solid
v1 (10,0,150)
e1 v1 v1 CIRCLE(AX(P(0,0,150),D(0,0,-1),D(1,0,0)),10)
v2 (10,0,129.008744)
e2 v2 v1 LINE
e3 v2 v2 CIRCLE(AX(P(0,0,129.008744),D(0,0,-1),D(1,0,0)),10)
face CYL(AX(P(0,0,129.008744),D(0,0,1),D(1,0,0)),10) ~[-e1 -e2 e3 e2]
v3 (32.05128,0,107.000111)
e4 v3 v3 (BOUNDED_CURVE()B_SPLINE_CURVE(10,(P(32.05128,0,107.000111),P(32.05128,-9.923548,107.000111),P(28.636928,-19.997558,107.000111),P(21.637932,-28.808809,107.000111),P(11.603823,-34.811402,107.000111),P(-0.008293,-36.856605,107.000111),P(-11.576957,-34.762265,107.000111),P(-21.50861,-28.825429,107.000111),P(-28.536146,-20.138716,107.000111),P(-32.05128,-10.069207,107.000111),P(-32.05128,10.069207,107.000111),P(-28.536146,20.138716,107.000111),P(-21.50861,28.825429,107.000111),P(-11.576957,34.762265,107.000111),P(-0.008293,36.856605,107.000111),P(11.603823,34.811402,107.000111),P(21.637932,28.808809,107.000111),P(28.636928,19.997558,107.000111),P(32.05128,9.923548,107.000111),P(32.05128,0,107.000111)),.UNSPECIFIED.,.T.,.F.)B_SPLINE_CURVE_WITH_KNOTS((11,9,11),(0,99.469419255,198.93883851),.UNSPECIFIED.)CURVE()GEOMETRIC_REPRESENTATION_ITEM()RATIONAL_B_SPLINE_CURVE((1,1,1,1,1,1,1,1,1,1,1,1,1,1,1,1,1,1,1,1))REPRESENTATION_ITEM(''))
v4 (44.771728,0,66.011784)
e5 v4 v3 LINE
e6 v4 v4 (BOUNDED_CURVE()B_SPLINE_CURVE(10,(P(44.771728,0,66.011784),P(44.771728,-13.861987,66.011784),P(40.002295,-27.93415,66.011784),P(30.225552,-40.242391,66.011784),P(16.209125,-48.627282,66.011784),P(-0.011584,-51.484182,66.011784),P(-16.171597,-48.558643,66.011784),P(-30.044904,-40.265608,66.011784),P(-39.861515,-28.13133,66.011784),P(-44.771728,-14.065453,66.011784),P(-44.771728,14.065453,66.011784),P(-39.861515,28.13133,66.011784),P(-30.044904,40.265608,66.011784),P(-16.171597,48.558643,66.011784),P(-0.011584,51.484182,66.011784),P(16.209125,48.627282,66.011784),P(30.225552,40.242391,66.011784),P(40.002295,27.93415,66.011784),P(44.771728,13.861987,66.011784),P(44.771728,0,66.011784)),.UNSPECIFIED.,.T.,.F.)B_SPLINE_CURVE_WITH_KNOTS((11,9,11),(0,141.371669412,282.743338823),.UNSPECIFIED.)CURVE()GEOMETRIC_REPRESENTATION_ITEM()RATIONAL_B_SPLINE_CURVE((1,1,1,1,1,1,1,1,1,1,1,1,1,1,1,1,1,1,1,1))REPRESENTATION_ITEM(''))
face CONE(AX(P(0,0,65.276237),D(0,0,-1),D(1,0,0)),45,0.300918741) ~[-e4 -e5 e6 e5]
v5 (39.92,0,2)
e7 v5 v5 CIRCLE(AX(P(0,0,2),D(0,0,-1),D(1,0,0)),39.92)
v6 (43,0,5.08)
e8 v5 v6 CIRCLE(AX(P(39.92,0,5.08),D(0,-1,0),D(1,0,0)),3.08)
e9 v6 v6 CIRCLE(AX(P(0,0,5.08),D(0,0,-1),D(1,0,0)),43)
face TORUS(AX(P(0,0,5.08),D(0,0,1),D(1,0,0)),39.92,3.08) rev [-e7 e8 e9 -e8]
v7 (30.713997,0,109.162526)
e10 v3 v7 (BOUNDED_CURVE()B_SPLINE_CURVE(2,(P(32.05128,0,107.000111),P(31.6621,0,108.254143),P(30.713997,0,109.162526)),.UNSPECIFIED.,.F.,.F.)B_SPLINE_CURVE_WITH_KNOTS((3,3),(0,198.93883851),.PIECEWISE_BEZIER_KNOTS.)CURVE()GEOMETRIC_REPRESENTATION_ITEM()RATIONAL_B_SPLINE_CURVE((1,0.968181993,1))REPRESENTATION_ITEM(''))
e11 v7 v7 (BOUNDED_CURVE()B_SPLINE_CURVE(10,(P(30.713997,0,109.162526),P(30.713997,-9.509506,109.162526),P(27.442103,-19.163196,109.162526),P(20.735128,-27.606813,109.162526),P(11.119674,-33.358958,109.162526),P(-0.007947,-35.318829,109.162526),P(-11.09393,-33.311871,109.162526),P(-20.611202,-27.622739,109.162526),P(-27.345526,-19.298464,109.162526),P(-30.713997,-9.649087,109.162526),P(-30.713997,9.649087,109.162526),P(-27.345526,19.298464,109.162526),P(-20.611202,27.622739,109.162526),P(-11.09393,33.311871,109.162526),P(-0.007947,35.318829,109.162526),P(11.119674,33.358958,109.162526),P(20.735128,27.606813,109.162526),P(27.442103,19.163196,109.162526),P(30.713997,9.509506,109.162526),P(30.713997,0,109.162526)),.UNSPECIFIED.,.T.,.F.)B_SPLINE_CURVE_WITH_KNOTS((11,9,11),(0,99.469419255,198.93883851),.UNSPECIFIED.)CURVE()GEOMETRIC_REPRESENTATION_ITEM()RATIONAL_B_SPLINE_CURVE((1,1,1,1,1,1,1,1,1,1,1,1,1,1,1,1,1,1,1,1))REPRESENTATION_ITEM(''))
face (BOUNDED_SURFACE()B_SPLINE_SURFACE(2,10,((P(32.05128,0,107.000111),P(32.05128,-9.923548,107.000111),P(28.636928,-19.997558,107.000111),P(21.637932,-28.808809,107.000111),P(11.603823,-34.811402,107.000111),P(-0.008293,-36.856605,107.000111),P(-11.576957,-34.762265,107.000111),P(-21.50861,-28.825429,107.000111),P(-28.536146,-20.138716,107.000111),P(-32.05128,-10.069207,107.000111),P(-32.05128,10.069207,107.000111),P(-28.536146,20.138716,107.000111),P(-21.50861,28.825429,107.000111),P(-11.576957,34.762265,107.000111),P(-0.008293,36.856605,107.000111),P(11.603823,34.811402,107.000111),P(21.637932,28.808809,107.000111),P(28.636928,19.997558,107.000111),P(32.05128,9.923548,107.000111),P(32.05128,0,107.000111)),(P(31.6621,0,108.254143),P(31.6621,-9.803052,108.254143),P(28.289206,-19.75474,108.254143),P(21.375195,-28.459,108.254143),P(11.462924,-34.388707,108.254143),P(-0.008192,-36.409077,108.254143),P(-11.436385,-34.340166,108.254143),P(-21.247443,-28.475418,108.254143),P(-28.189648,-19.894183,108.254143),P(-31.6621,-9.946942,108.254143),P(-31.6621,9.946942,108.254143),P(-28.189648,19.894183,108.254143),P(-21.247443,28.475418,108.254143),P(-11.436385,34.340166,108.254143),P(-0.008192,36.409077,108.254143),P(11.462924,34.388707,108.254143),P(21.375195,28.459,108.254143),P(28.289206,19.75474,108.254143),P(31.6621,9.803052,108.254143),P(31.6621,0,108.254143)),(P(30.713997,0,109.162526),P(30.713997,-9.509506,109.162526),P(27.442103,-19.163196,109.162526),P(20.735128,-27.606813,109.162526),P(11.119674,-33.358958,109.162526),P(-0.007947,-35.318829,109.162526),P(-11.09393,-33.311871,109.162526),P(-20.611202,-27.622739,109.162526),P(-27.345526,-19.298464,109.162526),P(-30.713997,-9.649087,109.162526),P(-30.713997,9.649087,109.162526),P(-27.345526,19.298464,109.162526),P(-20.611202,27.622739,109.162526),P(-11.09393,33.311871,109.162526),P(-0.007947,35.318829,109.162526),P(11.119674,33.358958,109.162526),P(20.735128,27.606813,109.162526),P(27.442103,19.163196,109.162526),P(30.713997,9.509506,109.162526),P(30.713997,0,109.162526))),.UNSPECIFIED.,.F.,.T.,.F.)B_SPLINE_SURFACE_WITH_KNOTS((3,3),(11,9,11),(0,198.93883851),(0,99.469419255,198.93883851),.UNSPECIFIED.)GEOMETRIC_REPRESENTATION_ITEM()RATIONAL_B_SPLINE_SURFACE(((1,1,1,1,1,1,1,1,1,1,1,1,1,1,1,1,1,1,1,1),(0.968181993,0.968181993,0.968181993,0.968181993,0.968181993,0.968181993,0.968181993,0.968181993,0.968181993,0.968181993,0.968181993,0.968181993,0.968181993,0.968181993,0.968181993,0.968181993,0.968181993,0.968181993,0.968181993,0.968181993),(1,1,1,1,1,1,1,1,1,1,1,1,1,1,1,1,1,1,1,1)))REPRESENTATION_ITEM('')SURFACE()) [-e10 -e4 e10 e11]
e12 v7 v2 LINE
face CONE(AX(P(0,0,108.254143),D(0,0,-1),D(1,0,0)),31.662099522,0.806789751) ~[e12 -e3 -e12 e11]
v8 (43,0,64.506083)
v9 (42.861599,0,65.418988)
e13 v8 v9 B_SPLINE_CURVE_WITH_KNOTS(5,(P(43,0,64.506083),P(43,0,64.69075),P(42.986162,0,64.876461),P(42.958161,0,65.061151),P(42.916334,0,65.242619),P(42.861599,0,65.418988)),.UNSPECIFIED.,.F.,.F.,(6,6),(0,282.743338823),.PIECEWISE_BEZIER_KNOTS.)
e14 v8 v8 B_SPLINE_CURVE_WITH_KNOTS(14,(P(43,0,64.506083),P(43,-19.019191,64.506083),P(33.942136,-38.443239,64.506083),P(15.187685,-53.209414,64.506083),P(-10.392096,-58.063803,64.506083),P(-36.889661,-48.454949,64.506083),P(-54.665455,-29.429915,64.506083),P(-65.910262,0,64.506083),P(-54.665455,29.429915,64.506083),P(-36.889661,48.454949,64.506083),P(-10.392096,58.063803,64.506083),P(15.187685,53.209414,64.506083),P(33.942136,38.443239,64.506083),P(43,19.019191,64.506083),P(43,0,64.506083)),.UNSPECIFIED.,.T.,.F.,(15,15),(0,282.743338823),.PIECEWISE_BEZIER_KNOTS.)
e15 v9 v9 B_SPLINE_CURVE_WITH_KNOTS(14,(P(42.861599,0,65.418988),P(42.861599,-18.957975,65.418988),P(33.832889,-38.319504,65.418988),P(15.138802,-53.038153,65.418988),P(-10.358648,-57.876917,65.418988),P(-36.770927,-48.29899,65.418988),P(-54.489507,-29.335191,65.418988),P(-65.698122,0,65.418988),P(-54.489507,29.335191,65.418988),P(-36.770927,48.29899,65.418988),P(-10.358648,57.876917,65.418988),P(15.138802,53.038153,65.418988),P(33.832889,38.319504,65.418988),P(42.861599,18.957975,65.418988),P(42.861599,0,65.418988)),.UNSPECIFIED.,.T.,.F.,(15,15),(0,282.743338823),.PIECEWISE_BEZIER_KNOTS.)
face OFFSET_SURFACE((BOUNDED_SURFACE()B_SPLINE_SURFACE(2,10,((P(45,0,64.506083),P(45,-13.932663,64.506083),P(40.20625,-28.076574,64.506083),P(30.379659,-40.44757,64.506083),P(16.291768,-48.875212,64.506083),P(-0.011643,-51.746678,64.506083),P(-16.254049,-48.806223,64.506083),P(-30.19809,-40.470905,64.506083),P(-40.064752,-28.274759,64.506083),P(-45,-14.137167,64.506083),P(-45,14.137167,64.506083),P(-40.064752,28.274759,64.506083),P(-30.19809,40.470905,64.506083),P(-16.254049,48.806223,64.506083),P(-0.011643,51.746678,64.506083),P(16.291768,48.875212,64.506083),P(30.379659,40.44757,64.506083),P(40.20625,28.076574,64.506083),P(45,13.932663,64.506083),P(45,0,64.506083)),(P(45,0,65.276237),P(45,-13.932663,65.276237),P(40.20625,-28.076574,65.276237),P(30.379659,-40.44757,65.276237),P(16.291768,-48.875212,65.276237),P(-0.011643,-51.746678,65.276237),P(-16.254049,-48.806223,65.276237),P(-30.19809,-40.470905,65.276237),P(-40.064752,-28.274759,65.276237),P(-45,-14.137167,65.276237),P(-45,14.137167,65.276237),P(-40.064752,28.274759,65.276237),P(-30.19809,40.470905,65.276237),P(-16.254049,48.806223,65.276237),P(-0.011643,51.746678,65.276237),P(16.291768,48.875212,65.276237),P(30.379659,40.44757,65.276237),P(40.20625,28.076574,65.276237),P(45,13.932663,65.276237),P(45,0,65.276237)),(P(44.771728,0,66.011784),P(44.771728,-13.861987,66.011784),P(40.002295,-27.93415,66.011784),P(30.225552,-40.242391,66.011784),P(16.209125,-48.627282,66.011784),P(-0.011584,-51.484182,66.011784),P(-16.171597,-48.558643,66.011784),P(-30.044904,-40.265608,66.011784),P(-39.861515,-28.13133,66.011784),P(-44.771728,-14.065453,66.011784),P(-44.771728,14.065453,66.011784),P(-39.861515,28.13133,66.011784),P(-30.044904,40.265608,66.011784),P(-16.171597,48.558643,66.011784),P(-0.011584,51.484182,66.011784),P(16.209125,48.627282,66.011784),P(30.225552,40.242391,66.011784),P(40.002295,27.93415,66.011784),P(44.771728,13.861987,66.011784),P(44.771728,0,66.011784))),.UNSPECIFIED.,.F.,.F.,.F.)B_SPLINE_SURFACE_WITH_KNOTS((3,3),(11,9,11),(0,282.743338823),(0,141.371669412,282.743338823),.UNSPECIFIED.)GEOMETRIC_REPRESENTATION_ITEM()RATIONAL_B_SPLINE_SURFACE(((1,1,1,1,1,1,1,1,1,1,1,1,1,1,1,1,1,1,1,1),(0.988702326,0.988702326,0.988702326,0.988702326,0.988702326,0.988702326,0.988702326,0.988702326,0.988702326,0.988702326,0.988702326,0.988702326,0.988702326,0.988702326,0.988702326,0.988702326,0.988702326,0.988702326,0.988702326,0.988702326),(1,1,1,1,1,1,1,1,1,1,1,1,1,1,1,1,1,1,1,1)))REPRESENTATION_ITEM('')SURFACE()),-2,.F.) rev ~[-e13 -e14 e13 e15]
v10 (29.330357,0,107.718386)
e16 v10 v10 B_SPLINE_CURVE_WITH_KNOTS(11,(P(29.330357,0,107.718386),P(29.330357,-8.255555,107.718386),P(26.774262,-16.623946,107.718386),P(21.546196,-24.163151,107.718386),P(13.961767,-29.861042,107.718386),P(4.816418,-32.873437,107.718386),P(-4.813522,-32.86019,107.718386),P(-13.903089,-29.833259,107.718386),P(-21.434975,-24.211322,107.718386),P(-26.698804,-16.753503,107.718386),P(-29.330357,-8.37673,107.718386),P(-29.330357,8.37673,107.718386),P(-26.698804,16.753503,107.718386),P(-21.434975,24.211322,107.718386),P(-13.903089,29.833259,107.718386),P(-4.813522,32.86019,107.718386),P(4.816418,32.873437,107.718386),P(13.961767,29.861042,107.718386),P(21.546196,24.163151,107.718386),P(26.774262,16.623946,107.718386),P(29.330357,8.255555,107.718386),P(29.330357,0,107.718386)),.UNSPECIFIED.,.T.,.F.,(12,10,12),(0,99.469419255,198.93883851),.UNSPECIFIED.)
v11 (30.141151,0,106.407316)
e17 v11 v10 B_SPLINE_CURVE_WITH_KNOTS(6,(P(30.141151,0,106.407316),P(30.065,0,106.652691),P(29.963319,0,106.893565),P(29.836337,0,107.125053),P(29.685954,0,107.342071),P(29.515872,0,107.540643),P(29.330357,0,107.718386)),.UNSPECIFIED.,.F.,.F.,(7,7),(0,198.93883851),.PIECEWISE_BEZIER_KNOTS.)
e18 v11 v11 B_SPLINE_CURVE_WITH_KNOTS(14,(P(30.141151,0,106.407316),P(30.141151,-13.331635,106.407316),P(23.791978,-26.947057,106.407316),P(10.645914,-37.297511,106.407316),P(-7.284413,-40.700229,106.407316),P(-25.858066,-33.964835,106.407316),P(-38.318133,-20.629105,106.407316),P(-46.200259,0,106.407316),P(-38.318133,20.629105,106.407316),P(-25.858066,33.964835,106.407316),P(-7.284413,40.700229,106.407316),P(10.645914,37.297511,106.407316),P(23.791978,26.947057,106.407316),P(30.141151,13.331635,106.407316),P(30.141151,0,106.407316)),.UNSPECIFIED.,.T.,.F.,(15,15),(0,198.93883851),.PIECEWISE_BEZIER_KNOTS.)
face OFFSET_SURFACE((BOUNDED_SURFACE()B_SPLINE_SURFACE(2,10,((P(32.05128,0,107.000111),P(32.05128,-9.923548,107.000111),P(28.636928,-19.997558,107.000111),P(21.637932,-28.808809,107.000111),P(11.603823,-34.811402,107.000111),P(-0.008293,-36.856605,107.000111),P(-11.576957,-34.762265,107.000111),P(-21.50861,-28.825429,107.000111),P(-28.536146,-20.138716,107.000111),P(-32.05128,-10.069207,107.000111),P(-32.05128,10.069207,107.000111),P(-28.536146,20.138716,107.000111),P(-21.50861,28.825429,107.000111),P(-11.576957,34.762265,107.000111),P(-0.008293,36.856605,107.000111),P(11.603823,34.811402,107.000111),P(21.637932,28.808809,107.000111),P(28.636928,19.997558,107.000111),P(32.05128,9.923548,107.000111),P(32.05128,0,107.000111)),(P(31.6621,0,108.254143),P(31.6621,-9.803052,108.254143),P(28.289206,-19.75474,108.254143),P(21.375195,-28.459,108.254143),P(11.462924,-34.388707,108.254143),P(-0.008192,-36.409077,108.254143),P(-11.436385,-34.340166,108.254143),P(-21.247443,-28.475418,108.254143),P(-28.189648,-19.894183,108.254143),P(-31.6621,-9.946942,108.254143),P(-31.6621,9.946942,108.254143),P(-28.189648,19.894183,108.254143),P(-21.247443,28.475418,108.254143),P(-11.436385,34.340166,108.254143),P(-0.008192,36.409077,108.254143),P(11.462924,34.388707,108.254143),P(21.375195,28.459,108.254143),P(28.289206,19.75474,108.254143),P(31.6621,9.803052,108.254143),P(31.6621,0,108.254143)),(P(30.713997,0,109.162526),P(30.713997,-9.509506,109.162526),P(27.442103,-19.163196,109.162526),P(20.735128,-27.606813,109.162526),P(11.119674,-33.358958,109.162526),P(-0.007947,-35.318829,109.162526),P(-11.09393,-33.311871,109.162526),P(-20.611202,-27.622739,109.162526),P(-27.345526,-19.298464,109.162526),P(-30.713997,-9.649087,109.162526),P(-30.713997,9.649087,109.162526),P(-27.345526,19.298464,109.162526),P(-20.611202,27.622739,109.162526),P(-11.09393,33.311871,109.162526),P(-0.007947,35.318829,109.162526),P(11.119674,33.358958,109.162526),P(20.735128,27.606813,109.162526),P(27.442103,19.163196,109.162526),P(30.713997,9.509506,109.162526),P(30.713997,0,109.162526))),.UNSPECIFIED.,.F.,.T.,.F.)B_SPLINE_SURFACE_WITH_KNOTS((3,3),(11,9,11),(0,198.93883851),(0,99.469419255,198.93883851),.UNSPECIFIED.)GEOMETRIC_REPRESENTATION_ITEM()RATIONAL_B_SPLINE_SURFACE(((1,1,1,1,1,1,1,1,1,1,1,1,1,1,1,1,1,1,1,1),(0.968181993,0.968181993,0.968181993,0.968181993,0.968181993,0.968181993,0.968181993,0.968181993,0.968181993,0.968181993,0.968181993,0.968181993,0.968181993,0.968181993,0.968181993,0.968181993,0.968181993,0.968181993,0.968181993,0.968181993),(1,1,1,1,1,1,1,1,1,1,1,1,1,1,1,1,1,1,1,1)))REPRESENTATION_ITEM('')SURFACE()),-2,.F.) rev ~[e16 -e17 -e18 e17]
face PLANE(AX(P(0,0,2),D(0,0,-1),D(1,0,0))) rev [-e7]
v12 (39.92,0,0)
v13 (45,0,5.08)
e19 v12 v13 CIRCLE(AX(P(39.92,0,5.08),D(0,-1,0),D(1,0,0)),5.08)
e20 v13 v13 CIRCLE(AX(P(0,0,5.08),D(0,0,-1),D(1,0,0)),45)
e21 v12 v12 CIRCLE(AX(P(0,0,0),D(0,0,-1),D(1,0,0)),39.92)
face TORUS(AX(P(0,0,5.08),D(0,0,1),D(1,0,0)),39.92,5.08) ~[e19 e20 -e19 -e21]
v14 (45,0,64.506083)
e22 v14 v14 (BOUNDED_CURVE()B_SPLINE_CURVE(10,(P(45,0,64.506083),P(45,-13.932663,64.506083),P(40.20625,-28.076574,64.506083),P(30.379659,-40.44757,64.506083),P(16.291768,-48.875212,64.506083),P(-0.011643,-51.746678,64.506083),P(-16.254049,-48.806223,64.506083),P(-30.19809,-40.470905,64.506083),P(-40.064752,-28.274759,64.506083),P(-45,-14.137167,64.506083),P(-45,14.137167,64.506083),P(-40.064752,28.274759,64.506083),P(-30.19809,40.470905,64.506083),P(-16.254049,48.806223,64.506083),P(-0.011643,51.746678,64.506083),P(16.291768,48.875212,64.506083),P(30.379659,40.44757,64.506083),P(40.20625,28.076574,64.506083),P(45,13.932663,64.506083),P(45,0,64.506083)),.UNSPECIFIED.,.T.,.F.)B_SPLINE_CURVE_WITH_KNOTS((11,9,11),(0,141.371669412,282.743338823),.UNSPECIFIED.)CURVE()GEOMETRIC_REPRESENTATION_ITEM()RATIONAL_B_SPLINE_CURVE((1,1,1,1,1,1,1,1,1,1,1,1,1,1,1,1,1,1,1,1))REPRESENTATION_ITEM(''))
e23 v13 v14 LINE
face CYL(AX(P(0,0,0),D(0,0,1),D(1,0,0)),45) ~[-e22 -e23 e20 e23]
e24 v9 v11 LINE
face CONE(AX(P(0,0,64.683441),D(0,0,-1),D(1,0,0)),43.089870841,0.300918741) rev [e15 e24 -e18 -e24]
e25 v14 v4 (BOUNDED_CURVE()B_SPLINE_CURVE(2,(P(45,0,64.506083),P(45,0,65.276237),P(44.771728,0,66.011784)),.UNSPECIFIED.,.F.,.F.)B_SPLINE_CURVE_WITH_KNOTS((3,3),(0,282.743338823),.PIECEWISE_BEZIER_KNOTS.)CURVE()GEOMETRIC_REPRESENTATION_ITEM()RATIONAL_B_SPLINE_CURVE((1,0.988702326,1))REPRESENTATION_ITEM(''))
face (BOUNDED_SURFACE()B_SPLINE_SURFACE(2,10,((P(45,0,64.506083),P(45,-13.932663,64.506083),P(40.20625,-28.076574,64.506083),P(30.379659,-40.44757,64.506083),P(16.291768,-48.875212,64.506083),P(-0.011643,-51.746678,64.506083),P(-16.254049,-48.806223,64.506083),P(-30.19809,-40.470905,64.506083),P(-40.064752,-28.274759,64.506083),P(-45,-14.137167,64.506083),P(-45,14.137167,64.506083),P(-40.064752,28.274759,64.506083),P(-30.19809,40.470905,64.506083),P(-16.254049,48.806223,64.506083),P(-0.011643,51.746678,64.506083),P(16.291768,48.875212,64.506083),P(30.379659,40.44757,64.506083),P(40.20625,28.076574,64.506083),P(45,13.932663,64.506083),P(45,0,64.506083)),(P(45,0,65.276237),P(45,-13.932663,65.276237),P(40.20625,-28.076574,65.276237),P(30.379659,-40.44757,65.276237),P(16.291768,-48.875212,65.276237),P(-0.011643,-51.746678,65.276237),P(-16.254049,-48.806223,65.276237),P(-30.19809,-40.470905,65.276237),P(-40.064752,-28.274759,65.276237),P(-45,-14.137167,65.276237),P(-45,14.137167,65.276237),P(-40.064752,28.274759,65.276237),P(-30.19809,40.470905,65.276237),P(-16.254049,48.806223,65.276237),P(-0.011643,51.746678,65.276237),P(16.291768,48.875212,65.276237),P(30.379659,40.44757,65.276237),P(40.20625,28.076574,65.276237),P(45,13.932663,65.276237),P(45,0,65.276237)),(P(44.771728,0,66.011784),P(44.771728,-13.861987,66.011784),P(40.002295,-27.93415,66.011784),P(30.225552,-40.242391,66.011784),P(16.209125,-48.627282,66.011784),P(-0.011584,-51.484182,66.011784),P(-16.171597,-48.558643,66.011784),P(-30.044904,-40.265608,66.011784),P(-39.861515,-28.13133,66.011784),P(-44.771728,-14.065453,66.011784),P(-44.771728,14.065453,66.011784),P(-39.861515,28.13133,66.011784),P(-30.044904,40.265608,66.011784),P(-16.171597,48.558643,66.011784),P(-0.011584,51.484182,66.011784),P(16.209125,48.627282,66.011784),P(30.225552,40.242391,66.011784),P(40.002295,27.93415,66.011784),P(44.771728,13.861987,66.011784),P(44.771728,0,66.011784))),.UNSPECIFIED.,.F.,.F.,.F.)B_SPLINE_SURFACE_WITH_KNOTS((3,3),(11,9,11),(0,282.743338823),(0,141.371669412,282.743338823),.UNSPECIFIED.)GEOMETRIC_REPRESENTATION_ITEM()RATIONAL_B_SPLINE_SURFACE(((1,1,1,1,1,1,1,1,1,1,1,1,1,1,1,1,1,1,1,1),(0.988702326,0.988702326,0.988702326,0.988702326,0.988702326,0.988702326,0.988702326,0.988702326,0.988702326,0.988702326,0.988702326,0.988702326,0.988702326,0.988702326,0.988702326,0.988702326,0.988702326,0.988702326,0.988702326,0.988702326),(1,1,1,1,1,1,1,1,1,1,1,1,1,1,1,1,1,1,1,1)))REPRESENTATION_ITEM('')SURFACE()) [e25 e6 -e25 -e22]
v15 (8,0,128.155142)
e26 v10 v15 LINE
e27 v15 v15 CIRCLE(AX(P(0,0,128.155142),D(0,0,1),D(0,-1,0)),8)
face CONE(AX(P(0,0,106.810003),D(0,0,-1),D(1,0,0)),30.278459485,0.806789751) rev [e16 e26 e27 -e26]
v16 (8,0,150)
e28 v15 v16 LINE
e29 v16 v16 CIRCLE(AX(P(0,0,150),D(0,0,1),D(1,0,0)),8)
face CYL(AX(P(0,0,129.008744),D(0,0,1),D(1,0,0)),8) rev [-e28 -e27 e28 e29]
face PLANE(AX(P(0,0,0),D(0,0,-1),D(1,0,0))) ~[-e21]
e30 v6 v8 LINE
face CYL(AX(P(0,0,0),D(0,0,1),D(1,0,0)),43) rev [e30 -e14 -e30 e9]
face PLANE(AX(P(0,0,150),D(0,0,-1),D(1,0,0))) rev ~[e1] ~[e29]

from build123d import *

# Parameters (mm, degrees)
F2_R = 5.08
F3_R = 5.08
F4_T = -2


with BuildPart() as f1:
    # F0 (on Front) → F1 (revolve)
    with BuildSketch(Plane.XZ):
        Polygon((0, 150), (0, 0), (45, 0), (45, 65.276236894), (31.6620995219, 108.2541429718), (10, 129.0087435294), (10, 150), align=None)
    revolve(axis=Axis((0, 0, 75), (0, 0, -1)))

    # F2
    f2_edges = [f1.edges().sort_by_distance(p)[0] for p in [
        (-45, 0, 0),
        (-45, 0, 65.276237),
        (45, 0, 32.638118),
    ]]
    fillet(f2_edges, radius=F2_R)

    # F3
    f3_edges = [f1.edges().sort_by_distance(p)[0] for p in [
        (-31.6621, 0, 108.254143),
    ]]
    fillet(f3_edges, radius=F3_R)

    # F4
    f4_openings = [f1.faces().sort_by_distance(p)[0] for p in [
        (0, 0, 150),
    ]]
    offset(amount=F4_T, openings=f4_openings, kind=Kind.INTERSECTION)


solid = f1.part
